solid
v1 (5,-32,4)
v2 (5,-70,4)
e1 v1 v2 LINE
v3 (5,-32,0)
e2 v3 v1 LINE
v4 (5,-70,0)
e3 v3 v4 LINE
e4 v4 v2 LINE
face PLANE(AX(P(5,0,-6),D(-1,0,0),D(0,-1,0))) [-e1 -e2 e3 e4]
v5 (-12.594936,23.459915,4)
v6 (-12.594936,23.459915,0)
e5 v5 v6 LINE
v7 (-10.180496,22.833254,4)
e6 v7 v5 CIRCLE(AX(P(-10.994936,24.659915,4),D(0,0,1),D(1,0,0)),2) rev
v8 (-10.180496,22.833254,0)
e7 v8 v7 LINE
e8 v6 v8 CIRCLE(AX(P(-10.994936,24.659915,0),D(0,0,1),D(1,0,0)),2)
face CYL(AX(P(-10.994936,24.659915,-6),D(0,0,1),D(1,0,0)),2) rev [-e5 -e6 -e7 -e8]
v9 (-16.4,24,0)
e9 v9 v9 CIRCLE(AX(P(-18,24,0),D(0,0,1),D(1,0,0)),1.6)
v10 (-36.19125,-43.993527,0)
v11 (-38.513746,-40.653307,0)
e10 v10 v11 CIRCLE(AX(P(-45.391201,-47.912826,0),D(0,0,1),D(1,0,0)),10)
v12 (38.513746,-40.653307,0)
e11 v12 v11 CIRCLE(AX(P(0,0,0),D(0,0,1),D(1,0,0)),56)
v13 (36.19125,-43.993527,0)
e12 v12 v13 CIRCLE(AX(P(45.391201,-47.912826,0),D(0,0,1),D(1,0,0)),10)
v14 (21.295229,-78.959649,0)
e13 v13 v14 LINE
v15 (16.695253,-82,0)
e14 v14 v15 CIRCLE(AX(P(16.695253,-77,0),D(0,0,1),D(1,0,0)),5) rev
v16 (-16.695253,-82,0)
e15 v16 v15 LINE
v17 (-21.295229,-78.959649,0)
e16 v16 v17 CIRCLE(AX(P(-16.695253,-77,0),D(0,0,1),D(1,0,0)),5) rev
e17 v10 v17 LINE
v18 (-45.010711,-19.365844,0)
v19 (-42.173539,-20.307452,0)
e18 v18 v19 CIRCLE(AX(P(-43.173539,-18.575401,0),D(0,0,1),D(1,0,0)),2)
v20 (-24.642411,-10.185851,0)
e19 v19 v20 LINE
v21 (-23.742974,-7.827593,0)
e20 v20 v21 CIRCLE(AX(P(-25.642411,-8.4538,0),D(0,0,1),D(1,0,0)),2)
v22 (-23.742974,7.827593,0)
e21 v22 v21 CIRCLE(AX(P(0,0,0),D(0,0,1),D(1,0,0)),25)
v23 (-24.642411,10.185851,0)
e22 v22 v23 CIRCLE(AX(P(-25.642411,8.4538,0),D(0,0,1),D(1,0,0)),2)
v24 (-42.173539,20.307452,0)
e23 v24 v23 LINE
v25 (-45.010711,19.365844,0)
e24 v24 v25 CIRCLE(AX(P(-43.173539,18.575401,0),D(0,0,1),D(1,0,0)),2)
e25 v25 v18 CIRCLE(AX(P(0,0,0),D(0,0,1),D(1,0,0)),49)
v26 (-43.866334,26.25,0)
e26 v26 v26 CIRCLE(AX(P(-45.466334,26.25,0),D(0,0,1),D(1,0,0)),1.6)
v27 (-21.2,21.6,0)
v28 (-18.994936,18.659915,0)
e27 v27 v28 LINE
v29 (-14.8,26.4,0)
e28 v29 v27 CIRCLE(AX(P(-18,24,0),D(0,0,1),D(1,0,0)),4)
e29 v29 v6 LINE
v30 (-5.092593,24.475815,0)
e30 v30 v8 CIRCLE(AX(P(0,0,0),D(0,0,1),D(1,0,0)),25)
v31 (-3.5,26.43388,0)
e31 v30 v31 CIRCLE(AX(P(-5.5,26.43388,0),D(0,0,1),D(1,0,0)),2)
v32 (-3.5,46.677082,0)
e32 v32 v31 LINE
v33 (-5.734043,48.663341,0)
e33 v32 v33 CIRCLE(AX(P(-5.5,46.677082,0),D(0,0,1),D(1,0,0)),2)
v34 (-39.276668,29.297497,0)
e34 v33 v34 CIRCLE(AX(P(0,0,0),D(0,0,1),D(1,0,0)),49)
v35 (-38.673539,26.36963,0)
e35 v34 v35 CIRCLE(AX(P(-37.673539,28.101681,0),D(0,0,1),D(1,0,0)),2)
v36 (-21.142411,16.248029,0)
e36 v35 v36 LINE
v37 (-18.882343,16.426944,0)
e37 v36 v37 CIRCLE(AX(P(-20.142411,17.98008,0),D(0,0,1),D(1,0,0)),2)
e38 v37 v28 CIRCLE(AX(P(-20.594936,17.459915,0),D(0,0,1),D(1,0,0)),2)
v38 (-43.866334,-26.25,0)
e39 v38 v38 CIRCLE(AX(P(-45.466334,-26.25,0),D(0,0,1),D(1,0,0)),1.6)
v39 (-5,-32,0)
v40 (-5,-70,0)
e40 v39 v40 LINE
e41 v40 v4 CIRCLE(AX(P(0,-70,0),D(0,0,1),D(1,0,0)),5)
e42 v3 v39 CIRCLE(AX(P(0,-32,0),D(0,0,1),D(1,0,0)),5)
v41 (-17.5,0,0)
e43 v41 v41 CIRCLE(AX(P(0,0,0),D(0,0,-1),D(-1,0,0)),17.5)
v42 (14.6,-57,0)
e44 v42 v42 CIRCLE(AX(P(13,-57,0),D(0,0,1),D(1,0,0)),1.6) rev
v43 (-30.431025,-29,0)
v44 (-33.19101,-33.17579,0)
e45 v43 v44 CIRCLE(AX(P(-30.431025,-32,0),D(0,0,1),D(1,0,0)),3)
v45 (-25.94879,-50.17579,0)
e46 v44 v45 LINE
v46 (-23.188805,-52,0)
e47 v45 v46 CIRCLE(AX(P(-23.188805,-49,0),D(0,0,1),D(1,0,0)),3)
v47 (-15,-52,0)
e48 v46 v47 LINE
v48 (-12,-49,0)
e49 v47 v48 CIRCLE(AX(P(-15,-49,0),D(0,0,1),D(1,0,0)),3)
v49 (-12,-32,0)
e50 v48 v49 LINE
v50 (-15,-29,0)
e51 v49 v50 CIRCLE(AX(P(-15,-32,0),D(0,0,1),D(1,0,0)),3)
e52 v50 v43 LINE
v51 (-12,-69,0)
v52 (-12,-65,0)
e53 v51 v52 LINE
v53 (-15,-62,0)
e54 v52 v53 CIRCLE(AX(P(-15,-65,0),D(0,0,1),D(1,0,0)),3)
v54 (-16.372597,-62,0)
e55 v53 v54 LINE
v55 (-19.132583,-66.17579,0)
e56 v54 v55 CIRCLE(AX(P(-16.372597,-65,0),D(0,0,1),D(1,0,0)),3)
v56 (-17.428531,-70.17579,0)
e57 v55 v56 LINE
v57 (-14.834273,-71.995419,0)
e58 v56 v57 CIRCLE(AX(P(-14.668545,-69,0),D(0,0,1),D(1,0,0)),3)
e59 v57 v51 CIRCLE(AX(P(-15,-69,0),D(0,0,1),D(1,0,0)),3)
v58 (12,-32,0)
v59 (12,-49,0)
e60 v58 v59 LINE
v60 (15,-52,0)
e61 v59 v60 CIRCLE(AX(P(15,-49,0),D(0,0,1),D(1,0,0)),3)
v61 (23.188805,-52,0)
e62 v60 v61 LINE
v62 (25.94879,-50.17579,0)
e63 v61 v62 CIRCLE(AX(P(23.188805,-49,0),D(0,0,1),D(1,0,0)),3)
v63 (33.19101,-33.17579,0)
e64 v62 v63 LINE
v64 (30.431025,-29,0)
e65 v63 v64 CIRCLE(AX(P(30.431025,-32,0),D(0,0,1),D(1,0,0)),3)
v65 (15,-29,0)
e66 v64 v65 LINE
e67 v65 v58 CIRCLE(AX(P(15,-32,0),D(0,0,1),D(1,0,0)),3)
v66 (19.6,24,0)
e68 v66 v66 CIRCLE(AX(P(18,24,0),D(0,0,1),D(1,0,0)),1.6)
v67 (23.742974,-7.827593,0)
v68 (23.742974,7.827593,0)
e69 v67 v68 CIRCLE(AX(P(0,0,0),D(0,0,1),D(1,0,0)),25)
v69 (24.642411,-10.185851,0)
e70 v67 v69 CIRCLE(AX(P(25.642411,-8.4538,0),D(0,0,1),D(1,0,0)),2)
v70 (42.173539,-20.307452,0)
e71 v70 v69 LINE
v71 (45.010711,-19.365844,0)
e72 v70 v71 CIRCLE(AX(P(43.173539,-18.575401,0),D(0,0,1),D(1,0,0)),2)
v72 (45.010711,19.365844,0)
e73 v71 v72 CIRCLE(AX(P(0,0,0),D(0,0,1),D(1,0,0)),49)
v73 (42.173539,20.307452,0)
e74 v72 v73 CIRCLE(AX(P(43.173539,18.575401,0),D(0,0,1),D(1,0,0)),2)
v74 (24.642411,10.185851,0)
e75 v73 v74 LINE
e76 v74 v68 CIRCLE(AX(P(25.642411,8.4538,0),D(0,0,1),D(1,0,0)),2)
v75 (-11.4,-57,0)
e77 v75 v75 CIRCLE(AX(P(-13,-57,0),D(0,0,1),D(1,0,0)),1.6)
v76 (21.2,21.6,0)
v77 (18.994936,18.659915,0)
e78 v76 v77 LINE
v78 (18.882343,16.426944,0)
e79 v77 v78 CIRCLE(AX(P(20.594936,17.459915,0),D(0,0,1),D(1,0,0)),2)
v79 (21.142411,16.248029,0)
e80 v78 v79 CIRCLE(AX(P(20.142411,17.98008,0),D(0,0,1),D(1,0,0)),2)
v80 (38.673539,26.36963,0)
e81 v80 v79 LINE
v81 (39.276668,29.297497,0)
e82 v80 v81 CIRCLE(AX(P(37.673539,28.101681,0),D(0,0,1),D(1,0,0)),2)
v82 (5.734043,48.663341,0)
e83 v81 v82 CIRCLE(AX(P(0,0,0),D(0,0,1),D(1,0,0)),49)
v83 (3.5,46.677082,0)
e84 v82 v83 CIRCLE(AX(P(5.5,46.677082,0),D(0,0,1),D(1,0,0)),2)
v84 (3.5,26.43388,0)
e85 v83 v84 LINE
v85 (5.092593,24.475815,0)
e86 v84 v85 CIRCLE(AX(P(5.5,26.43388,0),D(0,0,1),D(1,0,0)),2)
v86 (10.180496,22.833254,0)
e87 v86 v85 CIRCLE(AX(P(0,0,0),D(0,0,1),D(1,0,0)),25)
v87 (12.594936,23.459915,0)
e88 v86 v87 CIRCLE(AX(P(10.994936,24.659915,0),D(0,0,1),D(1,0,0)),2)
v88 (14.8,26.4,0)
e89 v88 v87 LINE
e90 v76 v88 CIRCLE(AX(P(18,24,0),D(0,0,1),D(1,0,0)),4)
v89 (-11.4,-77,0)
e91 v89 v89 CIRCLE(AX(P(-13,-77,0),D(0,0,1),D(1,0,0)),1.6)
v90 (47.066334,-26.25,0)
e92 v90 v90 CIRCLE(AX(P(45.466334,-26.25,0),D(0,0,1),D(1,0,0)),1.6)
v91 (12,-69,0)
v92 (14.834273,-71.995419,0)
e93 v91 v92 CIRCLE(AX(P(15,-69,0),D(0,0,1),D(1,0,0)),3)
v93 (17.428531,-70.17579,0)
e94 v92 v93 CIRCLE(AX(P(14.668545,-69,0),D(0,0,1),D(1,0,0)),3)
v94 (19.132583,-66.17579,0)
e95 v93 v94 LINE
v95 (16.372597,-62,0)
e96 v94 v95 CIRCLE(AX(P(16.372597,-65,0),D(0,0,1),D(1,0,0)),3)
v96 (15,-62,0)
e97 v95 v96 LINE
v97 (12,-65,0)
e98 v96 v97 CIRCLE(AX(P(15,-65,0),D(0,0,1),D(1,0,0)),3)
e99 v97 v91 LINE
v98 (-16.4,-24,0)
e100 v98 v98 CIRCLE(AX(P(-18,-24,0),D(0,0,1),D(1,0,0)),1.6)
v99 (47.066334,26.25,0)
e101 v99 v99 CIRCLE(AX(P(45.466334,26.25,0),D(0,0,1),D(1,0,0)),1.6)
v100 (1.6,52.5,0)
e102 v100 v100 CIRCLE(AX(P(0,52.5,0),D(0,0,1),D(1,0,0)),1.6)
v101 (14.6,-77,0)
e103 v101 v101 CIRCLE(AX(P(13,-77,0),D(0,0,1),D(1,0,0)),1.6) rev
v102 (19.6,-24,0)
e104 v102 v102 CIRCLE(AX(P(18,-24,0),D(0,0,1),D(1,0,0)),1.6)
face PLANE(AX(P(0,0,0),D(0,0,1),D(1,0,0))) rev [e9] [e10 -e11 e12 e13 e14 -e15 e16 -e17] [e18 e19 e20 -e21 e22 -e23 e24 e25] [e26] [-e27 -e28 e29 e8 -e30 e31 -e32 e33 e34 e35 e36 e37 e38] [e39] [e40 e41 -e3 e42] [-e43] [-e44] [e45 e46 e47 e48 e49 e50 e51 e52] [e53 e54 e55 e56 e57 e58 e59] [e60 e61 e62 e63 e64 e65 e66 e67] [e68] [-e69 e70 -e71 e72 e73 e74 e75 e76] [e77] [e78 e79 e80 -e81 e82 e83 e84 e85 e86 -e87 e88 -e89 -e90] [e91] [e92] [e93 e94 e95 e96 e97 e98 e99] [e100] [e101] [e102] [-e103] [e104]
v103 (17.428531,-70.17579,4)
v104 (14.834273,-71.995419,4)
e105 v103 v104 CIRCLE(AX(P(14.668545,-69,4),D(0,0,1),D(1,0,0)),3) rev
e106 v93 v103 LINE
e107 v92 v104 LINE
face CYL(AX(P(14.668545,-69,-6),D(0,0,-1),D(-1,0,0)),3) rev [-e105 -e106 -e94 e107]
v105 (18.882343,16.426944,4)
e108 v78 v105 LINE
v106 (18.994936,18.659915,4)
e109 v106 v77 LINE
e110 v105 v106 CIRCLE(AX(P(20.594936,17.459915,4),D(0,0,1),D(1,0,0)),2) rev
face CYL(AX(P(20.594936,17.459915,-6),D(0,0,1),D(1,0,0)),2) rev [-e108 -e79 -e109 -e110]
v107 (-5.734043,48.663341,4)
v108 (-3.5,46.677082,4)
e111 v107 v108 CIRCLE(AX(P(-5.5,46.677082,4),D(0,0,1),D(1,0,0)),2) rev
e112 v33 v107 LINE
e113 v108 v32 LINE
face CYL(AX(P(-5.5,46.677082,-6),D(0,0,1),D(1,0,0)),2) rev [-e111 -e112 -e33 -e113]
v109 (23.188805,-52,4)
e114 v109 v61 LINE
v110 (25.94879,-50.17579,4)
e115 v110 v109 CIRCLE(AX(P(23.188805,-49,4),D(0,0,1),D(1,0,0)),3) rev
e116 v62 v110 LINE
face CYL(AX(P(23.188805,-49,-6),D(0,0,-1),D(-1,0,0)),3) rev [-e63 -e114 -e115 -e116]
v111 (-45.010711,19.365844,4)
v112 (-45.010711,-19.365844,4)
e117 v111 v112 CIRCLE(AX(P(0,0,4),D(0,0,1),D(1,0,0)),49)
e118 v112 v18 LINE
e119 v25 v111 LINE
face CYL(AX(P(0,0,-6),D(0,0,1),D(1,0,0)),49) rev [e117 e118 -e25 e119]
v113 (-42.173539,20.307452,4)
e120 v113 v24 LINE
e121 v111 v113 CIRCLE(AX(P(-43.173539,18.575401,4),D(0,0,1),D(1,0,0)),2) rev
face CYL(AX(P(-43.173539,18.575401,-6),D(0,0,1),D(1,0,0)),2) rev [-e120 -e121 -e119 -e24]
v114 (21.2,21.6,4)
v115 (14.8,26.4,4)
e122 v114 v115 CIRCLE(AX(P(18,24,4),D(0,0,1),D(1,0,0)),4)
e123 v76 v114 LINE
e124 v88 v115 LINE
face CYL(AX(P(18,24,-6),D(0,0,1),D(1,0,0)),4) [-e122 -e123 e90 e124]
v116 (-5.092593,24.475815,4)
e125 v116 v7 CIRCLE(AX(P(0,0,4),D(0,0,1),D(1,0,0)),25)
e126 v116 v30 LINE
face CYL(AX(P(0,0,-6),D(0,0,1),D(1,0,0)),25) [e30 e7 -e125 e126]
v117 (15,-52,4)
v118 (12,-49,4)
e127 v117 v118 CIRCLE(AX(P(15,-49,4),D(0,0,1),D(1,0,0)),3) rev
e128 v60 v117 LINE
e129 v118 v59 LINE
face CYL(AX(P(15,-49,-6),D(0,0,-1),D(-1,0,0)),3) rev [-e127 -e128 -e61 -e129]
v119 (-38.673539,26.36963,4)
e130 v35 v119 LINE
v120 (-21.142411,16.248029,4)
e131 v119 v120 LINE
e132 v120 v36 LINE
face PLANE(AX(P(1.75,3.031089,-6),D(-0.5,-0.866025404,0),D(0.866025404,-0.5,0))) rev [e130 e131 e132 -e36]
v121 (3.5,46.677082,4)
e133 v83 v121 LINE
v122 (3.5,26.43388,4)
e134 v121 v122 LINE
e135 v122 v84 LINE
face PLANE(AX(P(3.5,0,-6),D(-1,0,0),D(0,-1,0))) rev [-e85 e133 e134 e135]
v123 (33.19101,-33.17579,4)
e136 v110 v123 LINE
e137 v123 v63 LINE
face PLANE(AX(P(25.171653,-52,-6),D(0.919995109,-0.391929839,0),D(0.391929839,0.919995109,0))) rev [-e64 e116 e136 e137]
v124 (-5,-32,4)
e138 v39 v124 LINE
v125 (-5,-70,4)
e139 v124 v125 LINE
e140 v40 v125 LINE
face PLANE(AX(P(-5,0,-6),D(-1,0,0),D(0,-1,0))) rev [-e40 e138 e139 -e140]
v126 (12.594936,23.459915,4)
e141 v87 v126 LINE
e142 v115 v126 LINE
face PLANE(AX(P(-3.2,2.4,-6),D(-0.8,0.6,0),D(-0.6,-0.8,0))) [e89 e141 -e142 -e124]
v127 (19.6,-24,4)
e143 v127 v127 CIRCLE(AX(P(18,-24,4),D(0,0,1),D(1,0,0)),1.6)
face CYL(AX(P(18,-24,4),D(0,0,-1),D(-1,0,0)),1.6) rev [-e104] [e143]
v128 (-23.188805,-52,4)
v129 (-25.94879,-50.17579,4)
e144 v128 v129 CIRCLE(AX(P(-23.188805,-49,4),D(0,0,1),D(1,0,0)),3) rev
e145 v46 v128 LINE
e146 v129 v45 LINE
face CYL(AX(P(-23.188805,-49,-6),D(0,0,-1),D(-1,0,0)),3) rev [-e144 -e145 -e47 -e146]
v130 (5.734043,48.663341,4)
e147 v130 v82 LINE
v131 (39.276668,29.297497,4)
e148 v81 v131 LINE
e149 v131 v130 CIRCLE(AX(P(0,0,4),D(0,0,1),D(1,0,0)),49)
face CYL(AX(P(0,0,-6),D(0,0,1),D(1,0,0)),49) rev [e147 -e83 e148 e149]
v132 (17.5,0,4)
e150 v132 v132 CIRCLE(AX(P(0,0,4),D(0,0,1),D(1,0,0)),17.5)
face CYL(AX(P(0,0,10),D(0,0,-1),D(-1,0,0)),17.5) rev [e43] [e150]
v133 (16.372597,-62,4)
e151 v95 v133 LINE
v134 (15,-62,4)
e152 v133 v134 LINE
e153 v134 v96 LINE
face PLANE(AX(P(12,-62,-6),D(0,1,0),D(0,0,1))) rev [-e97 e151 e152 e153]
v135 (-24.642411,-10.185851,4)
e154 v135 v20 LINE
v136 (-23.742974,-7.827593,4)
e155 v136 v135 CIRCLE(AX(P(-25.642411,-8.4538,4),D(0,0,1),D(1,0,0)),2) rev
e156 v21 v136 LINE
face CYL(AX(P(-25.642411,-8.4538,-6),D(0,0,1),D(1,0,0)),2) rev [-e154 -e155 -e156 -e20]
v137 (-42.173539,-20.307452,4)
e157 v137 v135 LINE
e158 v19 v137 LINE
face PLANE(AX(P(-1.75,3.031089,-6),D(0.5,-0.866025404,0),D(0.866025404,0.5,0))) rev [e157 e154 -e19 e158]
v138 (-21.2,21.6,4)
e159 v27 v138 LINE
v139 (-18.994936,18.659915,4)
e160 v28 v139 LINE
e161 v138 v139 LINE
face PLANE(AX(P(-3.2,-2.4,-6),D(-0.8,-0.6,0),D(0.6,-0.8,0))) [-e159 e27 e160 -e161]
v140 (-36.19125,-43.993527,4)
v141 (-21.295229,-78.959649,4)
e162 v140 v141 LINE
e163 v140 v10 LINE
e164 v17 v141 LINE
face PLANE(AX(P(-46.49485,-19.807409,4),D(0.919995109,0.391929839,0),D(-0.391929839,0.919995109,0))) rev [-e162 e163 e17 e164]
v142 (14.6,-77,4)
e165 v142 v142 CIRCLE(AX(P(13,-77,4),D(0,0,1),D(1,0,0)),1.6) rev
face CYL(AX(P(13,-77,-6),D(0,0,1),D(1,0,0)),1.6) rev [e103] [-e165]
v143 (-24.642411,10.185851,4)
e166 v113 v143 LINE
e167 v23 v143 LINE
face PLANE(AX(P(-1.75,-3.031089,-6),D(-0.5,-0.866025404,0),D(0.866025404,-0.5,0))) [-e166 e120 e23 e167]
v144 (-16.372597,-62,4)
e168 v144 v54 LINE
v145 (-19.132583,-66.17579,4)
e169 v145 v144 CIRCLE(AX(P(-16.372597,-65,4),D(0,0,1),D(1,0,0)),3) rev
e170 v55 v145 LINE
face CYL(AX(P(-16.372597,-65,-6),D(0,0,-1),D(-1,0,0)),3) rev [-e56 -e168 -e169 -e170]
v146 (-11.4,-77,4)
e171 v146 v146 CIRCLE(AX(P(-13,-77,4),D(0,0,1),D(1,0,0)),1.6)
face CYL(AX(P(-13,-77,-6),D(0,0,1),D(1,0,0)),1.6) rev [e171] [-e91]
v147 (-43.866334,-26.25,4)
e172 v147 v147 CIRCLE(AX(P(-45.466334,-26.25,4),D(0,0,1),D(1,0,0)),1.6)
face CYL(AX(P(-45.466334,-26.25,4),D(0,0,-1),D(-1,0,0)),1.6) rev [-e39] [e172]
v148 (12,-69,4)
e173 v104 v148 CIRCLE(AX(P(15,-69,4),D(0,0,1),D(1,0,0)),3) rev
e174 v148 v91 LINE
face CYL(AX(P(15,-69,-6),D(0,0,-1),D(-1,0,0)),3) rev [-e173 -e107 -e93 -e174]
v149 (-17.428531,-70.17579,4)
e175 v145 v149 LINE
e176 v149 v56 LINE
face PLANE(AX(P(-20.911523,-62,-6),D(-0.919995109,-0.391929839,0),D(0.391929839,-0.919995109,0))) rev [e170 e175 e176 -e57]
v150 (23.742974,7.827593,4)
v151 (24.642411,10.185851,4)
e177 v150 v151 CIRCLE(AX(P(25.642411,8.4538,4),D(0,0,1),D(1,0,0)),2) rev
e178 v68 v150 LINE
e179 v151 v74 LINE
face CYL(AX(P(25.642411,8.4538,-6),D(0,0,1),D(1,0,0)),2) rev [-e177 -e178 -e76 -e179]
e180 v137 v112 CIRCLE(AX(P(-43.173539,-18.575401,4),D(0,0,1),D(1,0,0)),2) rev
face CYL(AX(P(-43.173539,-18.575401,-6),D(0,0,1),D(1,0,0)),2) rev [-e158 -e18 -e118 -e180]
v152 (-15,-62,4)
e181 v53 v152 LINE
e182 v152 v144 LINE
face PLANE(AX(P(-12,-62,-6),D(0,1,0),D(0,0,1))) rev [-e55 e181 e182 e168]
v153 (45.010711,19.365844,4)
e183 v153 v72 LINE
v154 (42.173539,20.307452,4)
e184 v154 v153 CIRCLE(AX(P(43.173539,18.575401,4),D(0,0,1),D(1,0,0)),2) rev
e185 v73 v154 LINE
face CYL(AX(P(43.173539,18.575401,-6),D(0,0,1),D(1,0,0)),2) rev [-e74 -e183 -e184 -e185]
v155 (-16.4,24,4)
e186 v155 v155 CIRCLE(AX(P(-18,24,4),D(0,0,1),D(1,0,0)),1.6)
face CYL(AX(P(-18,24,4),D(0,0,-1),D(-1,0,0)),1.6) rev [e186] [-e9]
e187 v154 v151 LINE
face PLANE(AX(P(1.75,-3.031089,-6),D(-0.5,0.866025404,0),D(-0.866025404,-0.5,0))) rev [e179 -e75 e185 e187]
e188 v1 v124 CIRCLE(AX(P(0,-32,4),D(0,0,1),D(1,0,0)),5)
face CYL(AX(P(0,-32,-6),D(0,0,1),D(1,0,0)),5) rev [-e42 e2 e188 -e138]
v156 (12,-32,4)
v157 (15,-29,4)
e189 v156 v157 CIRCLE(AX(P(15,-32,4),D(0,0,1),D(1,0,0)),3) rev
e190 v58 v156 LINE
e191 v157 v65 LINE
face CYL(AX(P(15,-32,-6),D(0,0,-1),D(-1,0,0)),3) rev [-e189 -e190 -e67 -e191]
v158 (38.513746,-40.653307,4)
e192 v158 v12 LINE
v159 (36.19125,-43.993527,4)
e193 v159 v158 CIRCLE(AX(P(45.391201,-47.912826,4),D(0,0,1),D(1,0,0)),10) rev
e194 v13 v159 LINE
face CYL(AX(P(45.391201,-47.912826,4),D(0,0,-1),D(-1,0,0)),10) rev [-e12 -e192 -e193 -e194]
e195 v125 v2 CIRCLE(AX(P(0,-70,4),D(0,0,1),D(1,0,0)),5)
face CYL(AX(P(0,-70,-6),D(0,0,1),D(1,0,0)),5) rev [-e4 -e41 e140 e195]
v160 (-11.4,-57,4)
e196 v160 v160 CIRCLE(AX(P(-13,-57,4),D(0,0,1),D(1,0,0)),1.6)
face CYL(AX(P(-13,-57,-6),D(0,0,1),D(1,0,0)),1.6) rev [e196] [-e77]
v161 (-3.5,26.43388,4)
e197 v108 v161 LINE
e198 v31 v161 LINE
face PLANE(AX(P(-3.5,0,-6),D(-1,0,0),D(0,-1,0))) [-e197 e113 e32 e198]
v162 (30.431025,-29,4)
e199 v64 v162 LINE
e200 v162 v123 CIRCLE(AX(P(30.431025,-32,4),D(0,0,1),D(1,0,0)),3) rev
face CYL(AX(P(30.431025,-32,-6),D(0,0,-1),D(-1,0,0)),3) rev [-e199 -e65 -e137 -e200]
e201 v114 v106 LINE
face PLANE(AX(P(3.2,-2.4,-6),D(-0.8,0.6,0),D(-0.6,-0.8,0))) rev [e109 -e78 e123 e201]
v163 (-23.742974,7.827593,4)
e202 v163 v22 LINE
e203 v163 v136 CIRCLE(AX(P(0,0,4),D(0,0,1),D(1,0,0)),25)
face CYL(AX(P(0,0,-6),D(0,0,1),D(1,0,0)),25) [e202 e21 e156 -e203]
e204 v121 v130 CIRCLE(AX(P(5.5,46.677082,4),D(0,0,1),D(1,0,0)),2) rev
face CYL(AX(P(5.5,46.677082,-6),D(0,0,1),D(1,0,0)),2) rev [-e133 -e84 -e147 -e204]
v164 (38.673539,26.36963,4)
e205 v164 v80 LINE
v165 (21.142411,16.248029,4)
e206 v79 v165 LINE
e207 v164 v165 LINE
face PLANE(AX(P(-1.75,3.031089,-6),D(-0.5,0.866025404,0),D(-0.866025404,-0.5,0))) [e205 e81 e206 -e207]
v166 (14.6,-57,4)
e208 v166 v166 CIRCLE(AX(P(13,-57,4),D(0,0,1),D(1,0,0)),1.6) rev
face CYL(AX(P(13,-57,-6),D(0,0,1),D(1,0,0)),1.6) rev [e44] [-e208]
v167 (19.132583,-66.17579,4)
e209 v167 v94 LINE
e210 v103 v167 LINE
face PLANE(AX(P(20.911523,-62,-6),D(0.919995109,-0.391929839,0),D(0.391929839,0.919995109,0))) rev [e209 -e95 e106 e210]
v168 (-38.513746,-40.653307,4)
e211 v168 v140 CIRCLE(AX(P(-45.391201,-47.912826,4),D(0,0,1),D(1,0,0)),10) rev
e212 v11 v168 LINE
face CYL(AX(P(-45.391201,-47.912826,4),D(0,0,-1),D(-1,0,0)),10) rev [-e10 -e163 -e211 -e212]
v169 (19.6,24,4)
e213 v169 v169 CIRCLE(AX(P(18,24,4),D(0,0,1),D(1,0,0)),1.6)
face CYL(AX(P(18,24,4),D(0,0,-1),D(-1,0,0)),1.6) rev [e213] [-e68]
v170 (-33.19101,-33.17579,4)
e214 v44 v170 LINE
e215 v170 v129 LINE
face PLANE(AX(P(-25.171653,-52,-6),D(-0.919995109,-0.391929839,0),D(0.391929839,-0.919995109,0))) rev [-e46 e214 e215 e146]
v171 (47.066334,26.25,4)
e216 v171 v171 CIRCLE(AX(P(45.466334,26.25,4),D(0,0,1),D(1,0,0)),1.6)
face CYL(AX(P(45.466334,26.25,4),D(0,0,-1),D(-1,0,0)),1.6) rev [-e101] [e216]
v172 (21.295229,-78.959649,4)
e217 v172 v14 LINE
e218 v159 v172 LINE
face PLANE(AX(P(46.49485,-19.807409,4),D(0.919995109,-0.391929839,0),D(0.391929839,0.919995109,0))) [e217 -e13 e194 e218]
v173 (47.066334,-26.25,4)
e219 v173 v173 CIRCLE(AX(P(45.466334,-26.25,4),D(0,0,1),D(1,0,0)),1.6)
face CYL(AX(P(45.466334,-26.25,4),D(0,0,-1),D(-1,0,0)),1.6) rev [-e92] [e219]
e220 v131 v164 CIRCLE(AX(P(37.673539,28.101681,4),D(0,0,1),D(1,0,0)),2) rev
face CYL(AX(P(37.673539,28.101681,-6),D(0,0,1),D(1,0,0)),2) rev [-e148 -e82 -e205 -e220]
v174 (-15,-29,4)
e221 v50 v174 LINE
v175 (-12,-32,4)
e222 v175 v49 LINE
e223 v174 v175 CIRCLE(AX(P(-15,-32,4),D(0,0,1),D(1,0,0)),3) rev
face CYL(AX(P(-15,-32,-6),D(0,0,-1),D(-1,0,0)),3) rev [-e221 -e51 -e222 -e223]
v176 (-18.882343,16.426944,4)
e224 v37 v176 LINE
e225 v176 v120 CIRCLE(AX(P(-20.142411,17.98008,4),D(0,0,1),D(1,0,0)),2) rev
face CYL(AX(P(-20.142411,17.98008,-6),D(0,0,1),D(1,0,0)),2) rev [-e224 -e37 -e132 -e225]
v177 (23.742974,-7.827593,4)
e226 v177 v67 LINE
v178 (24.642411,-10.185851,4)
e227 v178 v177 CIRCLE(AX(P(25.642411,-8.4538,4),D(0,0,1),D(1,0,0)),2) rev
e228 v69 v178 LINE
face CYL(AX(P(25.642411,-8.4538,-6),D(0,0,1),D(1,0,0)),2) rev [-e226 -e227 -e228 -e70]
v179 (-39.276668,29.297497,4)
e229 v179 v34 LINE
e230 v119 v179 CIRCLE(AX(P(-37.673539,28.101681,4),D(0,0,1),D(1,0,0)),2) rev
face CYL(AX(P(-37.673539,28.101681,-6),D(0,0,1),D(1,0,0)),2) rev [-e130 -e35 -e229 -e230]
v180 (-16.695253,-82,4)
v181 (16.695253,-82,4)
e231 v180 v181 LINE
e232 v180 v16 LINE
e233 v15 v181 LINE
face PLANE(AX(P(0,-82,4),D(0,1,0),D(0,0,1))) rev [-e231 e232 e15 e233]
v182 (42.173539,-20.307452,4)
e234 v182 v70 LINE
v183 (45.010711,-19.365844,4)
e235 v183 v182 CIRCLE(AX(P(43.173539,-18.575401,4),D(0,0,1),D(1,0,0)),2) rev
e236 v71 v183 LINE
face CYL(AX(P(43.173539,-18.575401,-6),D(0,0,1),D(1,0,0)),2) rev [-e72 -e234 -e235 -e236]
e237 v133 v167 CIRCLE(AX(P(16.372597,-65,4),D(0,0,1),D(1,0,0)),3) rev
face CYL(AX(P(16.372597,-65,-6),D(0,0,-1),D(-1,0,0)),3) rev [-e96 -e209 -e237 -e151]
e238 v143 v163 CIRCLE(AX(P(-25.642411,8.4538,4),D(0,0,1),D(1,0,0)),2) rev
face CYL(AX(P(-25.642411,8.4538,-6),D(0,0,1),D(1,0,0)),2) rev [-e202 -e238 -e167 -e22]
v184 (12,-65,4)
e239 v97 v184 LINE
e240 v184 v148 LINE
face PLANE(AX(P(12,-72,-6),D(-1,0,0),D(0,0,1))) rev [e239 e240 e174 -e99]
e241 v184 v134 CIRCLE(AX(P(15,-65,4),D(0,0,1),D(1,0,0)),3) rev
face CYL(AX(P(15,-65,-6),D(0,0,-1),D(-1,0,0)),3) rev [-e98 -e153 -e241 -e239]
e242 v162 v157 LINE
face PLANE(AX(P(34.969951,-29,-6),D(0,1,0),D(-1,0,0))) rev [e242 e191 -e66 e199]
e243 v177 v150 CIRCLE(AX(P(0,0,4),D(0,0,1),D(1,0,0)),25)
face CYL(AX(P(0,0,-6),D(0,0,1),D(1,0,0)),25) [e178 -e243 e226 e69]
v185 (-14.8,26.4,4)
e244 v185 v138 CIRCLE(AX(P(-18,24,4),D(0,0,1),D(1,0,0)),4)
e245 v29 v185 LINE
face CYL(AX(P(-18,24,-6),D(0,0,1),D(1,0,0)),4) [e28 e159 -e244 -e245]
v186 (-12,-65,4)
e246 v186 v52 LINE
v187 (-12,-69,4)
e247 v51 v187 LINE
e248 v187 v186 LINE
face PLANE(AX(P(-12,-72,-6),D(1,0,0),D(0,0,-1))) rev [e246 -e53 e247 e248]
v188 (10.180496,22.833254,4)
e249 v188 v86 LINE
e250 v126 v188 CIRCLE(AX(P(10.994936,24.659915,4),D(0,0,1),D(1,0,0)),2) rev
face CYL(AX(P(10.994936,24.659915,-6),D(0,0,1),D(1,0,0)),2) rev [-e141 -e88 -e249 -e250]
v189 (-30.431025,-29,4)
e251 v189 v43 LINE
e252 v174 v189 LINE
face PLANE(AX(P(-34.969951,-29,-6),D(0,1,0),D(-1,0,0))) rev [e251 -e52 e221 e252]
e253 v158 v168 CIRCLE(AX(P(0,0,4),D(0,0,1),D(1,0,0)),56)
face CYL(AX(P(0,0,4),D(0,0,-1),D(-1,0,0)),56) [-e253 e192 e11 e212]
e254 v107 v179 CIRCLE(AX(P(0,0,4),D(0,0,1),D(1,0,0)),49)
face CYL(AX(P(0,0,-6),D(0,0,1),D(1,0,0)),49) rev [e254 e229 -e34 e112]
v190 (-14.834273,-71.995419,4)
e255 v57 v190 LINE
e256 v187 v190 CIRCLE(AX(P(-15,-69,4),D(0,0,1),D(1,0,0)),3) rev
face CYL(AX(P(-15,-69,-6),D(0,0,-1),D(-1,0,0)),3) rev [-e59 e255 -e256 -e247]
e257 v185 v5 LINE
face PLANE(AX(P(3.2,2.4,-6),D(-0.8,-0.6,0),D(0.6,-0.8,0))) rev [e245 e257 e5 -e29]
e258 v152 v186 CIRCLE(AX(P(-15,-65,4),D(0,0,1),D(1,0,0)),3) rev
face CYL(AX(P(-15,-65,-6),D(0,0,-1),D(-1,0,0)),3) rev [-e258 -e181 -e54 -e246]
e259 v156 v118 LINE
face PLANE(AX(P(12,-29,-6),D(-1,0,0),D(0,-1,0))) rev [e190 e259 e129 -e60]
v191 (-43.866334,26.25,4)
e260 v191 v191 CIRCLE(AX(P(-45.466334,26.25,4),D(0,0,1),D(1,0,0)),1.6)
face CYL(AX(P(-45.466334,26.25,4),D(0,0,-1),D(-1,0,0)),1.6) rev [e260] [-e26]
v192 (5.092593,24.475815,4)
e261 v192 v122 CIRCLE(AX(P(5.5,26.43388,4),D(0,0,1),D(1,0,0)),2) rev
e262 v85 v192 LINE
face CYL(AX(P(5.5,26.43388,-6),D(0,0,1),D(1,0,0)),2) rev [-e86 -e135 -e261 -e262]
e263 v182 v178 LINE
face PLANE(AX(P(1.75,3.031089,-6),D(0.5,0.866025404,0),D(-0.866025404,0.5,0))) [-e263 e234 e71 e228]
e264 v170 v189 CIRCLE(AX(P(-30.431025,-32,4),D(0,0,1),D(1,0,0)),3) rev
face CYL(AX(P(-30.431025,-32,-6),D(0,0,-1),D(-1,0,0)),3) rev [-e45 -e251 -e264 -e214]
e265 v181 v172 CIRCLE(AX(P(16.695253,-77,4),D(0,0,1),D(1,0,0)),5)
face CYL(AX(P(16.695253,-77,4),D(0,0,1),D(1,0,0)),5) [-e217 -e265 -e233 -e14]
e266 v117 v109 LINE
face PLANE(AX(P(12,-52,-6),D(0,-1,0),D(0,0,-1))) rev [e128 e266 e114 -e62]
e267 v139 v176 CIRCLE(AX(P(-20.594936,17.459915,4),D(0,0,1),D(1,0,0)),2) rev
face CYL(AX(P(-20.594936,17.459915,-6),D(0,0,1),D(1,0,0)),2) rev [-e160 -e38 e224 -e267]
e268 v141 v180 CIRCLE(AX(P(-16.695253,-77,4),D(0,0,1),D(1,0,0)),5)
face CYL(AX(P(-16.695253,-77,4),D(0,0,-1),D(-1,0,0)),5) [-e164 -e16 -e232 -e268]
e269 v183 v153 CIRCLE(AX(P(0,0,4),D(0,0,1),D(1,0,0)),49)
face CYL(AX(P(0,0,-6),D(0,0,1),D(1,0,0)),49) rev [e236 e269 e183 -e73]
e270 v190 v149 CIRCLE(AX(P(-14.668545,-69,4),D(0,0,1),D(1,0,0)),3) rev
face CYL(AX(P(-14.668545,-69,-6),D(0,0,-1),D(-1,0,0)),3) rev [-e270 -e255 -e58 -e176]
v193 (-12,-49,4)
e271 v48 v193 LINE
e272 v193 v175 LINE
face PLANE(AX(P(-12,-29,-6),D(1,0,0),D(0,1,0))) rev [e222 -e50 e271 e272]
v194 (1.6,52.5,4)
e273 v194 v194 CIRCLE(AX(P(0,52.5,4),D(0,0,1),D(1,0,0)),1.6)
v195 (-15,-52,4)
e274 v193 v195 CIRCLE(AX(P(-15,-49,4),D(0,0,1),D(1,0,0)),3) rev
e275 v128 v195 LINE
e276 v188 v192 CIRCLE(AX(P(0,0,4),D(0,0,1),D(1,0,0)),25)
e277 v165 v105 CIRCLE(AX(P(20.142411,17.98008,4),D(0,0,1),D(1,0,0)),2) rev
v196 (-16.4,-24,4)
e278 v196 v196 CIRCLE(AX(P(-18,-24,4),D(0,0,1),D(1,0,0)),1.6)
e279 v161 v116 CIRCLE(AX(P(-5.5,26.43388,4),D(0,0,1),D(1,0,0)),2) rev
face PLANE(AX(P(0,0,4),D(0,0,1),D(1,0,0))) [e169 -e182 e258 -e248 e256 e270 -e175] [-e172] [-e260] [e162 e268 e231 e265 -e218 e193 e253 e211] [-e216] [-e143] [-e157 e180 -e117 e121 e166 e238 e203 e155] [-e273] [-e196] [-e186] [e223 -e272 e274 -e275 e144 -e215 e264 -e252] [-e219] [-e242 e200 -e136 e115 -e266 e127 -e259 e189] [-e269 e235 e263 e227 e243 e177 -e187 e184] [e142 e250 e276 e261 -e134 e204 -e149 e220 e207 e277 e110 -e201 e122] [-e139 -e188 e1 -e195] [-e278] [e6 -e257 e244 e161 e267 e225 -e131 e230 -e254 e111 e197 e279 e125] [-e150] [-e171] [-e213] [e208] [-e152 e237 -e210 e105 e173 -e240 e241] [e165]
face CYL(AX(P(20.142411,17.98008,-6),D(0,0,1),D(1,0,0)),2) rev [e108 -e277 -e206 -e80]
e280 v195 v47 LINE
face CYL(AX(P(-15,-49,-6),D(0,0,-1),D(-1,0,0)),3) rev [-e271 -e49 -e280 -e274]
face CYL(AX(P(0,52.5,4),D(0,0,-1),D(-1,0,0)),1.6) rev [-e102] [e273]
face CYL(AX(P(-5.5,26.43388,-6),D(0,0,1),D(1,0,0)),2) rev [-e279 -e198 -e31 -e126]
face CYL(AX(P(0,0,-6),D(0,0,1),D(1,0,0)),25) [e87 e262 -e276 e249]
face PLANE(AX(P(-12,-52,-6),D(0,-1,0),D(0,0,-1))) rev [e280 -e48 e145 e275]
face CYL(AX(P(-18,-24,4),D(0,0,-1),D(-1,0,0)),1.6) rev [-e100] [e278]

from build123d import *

# Parameters (mm, degrees)
SKETCH_1_R          = 1.6
EXTRUDE_1_DEPTH     = 4
FILLET_1_R          = 10
FILLET_2_R          = 5
SKETCH_2_R          = 1.6
CUT_EXTRUDE_3_DEPTH = 10
SKETCH_3_R          = 17.5
CUT_EXTRUDE_4_DEPTH = 10
FILLET_3_R          = 2
CUT_EXTRUDE_5_DEPTH = 10
FILLET_4_R          = 3


with BuildPart() as part:
    # 草图1 → 凸台-拉伸1 (new body)
    # profile 1 of 13: a face of its own
    with BuildSketch(Plane.XY):
        with BuildLine():
            Line((-37.040518355, -42), (-31.5, -42))
            Line((-31.5, -42), (-20, -42))
            Line((-20, -42), (0, -42))
            Line((0, -42), (20, -42))
            Line((20, -42), (31.5, -42))
            Line((31.5, -42), (37.040518355, -42))
            ThreePointArc((37.040518355, -42), (51.040518355, -23.040518355), (56, 0))
            ThreePointArc((56, 0), (-23.040518355, 51.040518355), (-37.040518355, -42))
        make_face()
        with Locations((-45.466333699, -26.25)):
            Circle(SKETCH_1_R, mode=Mode.SUBTRACT)
        with Locations((-18, -24)):
            Circle(SKETCH_1_R, mode=Mode.SUBTRACT)
        with Locations((18, -24)):
            Circle(SKETCH_1_R, mode=Mode.SUBTRACT)
        with Locations((45.466333699, -26.25)):
            Circle(SKETCH_1_R, mode=Mode.SUBTRACT)
        with Locations((-45.466333699, 26.25)):
            Circle(SKETCH_1_R, mode=Mode.SUBTRACT)
        with Locations((-18, 24)):
            Circle(SKETCH_1_R, mode=Mode.SUBTRACT)
        with Locations((18, 24)):
            Circle(SKETCH_1_R, mode=Mode.SUBTRACT)
        with Locations((0, 52.5)):
            Circle(SKETCH_1_R, mode=Mode.SUBTRACT)
        with Locations((45.466333699, 26.25)):
            Circle(SKETCH_1_R, mode=Mode.SUBTRACT)
    # profile 2 of 13: a face of its own
    with BuildSketch(Plane.XY):
        with BuildLine():
            Line((20, -82), (37.040518355, -42))
            ThreePointArc((37.040518355, -42), (28.982109133, -47.916983943), (20, -52.306787322))
            Line((20, -52.306787322), (20, -82))
        make_face()
    # profile 3 of 13: a face of its own
    with BuildSketch(Plane.XY):
        with BuildLine():
            Line((31.5, -42), (20, -42))
            Line((20, -42), (20, -52.306787322))
            ThreePointArc((20, -52.306787322), (28.982109133, -47.916983943), (37.040518355, -42))
            Line((37.040518355, -42), (31.5, -42))
        make_face()
    # profile 4 of 13: a face of its own
    with BuildSketch(Plane.XY):
        with BuildLine():
            Line((20, -42), (0, -42))
            Line((0, -42), (0, -50.9))
            ThreePointArc((0, -50.9), (1.13137085, -51.36862915), (1.6, -52.5))
            ThreePointArc((1.6, -52.5), (1.13137085, -53.63137085), (0, -54.1))
            Line((0, -54.1), (0, -56))
            ThreePointArc((0, -56), (10.16906854, -55.068957181), (20, -52.306787322))
            Line((20, -52.306787322), (20, -42))
        make_face()
    # profile 5 of 13: a face of its own
    with BuildSketch(Plane.XY):
        with BuildLine():
            ThreePointArc((20, -52.306787322), (10.16906854, -55.068957181), (0, -56))
            Line((0, -56), (0, -82))
            Line((0, -82), (20, -82))
            Line((20, -82), (20, -52.306787322))
        make_face()
    # profile 6 of 13: a face of its own
    with BuildSketch(Plane.XY):
        with BuildLine():
            ThreePointArc((0, -56), (-10.16906854, -55.068957181), (-20, -52.306787322))
            Line((-20, -52.306787322), (-20, -82))
            Line((-20, -82), (0, -82))
            Line((0, -82), (0, -56))
        make_face()
    # profile 7 of 13: a face of its own
    with BuildSketch(Plane.XY):
        with BuildLine():
            Line((0, -42), (-20, -42))
            Line((-20, -42), (-20, -52.306787322))
            ThreePointArc((-20, -52.306787322), (-10.16906854, -55.068957181), (0, -56))
            Line((0, -56), (0, -54.1))
            ThreePointArc((0, -54.1), (-1.6, -52.5), (0, -50.9))
            Line((0, -50.9), (0, -42))
        make_face()
    # profile 8 of 13: a face of its own
    with BuildSketch(Plane.XY):
        with BuildLine():
            ThreePointArc((-20, -52.306787322), (-28.982109133, -47.916983943), (-37.040518355, -42))
            Line((-37.040518355, -42), (-20, -82))
            Line((-20, -82), (-20, -52.306787322))
        make_face()
    # profile 9 of 13: a face of its own
    with BuildSketch(Plane.XY):
        with BuildLine():
            Line((-20, -42), (-31.5, -42))
            Line((-31.5, -42), (-37.040518355, -42))
            ThreePointArc((-37.040518355, -42), (-28.982109133, -47.916983943), (-20, -52.306787322))
            Line((-20, -52.306787322), (-20, -42))
        make_face()
    # profile 10 of 13: a face of its own
    with BuildSketch(Plane.XY):
        with BuildLine():
            ThreePointArc((1.6, -52.5), (1.13137085, -51.36862915), (0, -50.9))
            Line((0, -50.9), (0, -54.1))
            ThreePointArc((0, -54.1), (1.13137085, -53.63137085), (1.6, -52.5))
        make_face()
    # profile 11 of 13: a face of its own
    with BuildSketch(Plane.XY):
        with BuildLine():
            Line((0, -54.1), (0, -50.9))
            ThreePointArc((0, -50.9), (-1.6, -52.5), (0, -54.1))
        make_face()
    # profile 12 of 13: a face of its own
    with BuildSketch(Plane.XY):
        with BuildLine():
            ThreePointArc((1.6, -52.5), (1.13137085, -51.36862915), (0, -50.9))
            Line((0, -50.9), (0, -54.1))
            ThreePointArc((0, -54.1), (1.13137085, -53.63137085), (1.6, -52.5))
        make_face()
    # profile 13 of 13: a face of its own
    with BuildSketch(Plane.XY):
        with BuildLine():
            Line((0, -54.1), (0, -50.9))
            ThreePointArc((0, -50.9), (-1.6, -52.5), (0, -54.1))
        make_face()
    extrude(amount=EXTRUDE_1_DEPTH)

    # 圆角1
    fillet_1_edges = [part.edges().sort_by_distance(p)[0] for p in [
        (-37.040518355, -42, 2),
        (37.040518355, -42, 2),
    ]]
    fillet(fillet_1_edges, radius=FILLET_1_R)

    # 圆角2
    fillet_2_edges = [part.edges().sort_by_distance(p)[0] for p in [
        (-20, -82, 2),
        (20, -82, 2),
    ]]
    fillet(fillet_2_edges, radius=FILLET_2_R)

    # 草图2 → 切除-拉伸3 (cut)
    with BuildSketch(Plane.XY.offset(4)):
        with BuildLine():
            Line((-3.5, 24.753787589), (-3.5, 48.874840153))
            ThreePointArc((-3.5, 48.874840153), (-24.5, 42.435244785), (-40.576853179, 27.46850899))
            Line((-40.576853179, 27.46850899), (-19.687408892, 15.407982708))
            ThreePointArc((-19.687408892, 15.407982708), (-18.871882173, 16.396708915), (-18.006755215, 17.342340287))
            Line((-18.006755215, 17.342340287), (-21.2, 21.6))
            ThreePointArc((-21.2, 21.6), (-20.4, 27.2), (-14.8, 26.4))
            Line((-14.8, 26.4), (-11.606755215, 22.142340287))
            ThreePointArc((-11.606755215, 22.142340287), (-7.66540459, 23.795830989), (-3.5, 24.753787589))
        make_face()
        with BuildLine():
            ThreePointArc((40.576853179, 27.46850899), (24.5, 42.435244785), (3.5, 48.874840153))
            Line((3.5, 48.874840153), (3.5, 24.753787589))
            ThreePointArc((3.5, 24.753787589), (7.66540459, 23.795830989), (11.606755215, 22.142340287))
            Line((11.606755215, 22.142340287), (14.8, 26.4))
            ThreePointArc((14.8, 26.4), (20.4, 27.2), (21.2, 21.6))
            Line((21.2, 21.6), (18.006755215, 17.342340287))
            ThreePointArc((18.006755215, 17.342340287), (18.871882173, 16.396708915), (19.687408892, 15.407982708))
            Line((19.687408892, 15.407982708), (40.576853179, 27.46850899))
        make_face()
        with BuildLine():
            ThreePointArc((-23.187408892, -9.345804881), (-25, 0), (-23.187408892, 9.345804881))
            Line((-23.187408892, 9.345804881), (-44.076853179, 21.406331163))
            ThreePointArc((-44.076853179, 21.406331163), (-49, 0), (-44.076853179, -21.406331163))
            Line((-44.076853179, -21.406331163), (-23.187408892, -9.345804881))
        make_face()
        with BuildLine():
            Line((44.076853179, 21.406331163), (23.187408892, 9.345804881))
            ThreePointArc((23.187408892, 9.345804881), (25, 0), (23.187408892, -9.345804881))
            Line((23.187408892, -9.345804881), (44.076853179, -21.406331163))
            ThreePointArc((44.076853179, -21.406331163), (49, 0), (44.076853179, 21.406331163))
        make_face()
        with BuildLine():
            Line((-5, -32), (-5, -70))
            ThreePointArc((-5, -70), (0, -75), (5, -70))
            Line((5, -70), (5, -32))
            ThreePointArc((5, -32), (0, -27), (-5, -32))
        make_face()
        with Locations((-13, -77)):
            Circle(SKETCH_2_R)
        with Locations((-13, -57)):
            Circle(SKETCH_2_R)
        with Locations((13, -57)):
            Circle(SKETCH_2_R)
        with Locations((13, -77)):
            Circle(SKETCH_2_R)
    extrude(amount=-CUT_EXTRUDE_3_DEPTH, mode=Mode.SUBTRACT)

    # 草图3 → 切除-拉伸4 (cut)
    with BuildSketch(Plane(origin=(0, 0, 0), x_dir=(-1, 0, 0), z_dir=(0, 0, -1))):
        Circle(SKETCH_3_R)
    extrude(amount=-CUT_EXTRUDE_4_DEPTH, mode=Mode.SUBTRACT)

    # 圆角3
    # the kernel refuses this fillet: 2 mm, written as the material it adds along each edge
    with BuildSketch(Plane(origin=(44.076853179, -21.406331163, 4), x_dir=(0.4161517184579159, 0.9092951925664864, 0), z_dir=(0, 0, -1)), Plane(origin=(40.576853179, 27.46850899, 4), x_dir=(-0.5793968770727322, 0.8150455562963123, 0), z_dir=(0, 0, -1)), Plane(origin=(-44.076853179, 21.406331163, 4), x_dir=(-0.4161517184579201, -0.9092951925664845, 0), z_dir=(0, 0, -1)), Plane(origin=(-3.5, 48.874840153, 4), x_dir=(-0.9955485955305929, -0.09424963627019442, 0), z_dir=(0, 0, -1))) as fillet_3_piece_1:
        with BuildLine():
            CenterArc((2.198235081, -1.9994756), FILLET_3_R, 88.687910399, 96.72022296)
            Line((0.20713789, -2.187974872), (0, 0))
            ThreePointArc((0, 0), (1.122015823, 0.012847802), (2.244031646, 0))
        make_face()
    extrude(amount=4)
    with BuildSketch(Plane(origin=(23.187408892, -9.345804881, 4), x_dir=(0.8660254037844346, -0.500000000000007, 0), z_dir=(0, 0, -1)), Plane(origin=(19.687408892, 15.407982708, 4), x_dir=(0.8660254037844409, 0.4999999999999962, 0), z_dir=(0, 0, -1)), Plane(origin=(-3.5, 24.753787589, 4), x_dir=(0, 1, 0), z_dir=(0, 0, -1))) as fillet_3_piece_2:
        with BuildLine():
            CenterArc((1.680092187, -2), FILLET_3_R, 90, 78.246374383)
            ThreePointArc((-0.277972982, -1.592592593), (-0.126109645, -0.798543836), (0, 0))
            Line((0, 0), (1.680092187, 0))
        make_face()
    extrude(amount=4)
    with BuildSketch(Plane(origin=(23.187408892, 9.345804881, 4), x_dir=(0.8660254037844413, 0.49999999999999545, 0), z_dir=(0, 0, -1)), Plane(origin=(3.5, 24.753787589, 4), x_dir=(0, 1, 0), z_dir=(0, 0, -1)), Plane(origin=(-23.187408892, -9.345804881, 4), x_dir=(-0.8660254037844479, -0.49999999999998407, 0), z_dir=(0, 0, -1)), Plane(origin=(-19.687408892, 15.407982708, 4), x_dir=(-0.8660254037844282, 0.5000000000000182, 0), z_dir=(0, 0, -1))) as fillet_3_piece_3:
        with BuildLine():
            CenterArc((1.680092187, 2), FILLET_3_R, 191.753625617, 78.246374383)
            ThreePointArc((-0.277972982, 1.592592593), (-0.126109645, 0.798543836), (0, 0))
            Line((0, 0), (1.680092187, 0))
        make_face()
    extrude(amount=4)
    with BuildSketch(Plane(origin=(44.076853179, 21.406331163, 4), x_dir=(0.4161517184579126, -0.9092951925664878, 0), z_dir=(0, 0, -1)), Plane(origin=(3.5, 48.874840153, 4), x_dir=(0.9955485955305919, -0.09424963627020293, 0), z_dir=(0, 0, -1))) as fillet_3_piece_4:
        with BuildLine():
            CenterArc((2.198235081, 1.9994756), FILLET_3_R, 174.591866641, 96.72022296)
            Line((0.20713789, 2.187974872), (0, 0))
            ThreePointArc((0, 0), (1.122015823, -0.012847802), (2.244031646, 0))
        make_face()
    extrude(amount=4)
    with BuildSketch(Plane(origin=(18.006755215, 17.342340287, 4), x_dir=(0.6705154511323562, -0.7418955652871723, 0), z_dir=(0, 0, -1)), Plane(origin=(-11.606755215, 22.142340287, 4), x_dir=(0.8999640689927433, 0.43596407480665733, 0), z_dir=(0, 0, -1))) as fillet_3_piece_5:
        with BuildLine():
            CenterArc((1.648187328, -1.998995117), FILLET_3_R, 91.816346093, 77.160411593)
            Line((-0.314912072, -1.616580754), (0, 0))
            ThreePointArc((0, 0), (0.792397754, -0.01256104), (1.584795508, 0))
        make_face()
    extrude(amount=4)
    with BuildSketch(Plane(origin=(11.606755215, 22.142340287, 4), x_dir=(-0.8999640689927446, 0.43596407480665467, 0), z_dir=(0, 0, -1)), Plane(origin=(-18.006755215, 17.342340287, 4), x_dir=(-0.6705154511323576, -0.7418955652871712, 0), z_dir=(0, 0, -1))) as fillet_3_piece_6:
        with BuildLine():
            CenterArc((1.648187328, 1.998995117), FILLET_3_R, 191.023242314, 77.160411593)
            Line((-0.314912072, 1.616580754), (0, 0))
            ThreePointArc((0, 0), (0.792397754, 0.01256104), (1.584795508, 0))
        make_face()
    extrude(amount=4)
    with BuildSketch(Plane(origin=(-23.187408892, 9.345804881, 4), x_dir=(-0.34364763241930923, -0.9390986661329059, 0), z_dir=(0, 0, -1))) as fillet_3_piece_7:
        with BuildLine():
            CenterArc((1.681336239, 1.998954279), FILLET_3_R, 189.900735932, 78.246374383)
            Line((-0.288877997, 1.655070772), (0, 0))
            ThreePointArc((0, 0), (0.80833473, 0.013071518), (1.616669461, 0))
        make_face()
    extrude(amount=4)
    with BuildSketch(Plane(origin=(-44.076853179, -21.406331163, 4), x_dir=(0.8660254037845937, 0.49999999999973144, 0), z_dir=(0, 0, -1)), Plane(origin=(-40.576853179, 27.46850899, 4), x_dir=(0.8660254037845372, -0.49999999999982914, 0), z_dir=(0, 0, -1))) as fillet_3_piece_8:
        with BuildLine():
            CenterArc((2.197757982, -2), FILLET_3_R, 90, 96.72022296)
            ThreePointArc((0.211499166, -2.234042553), (0.092958972, -1.118232177), (0, 0))
            Line((0, 0), (2.197757982, 0))
        make_face()
    extrude(amount=4)

    # 草图4 → 切除-拉伸5 (cut)
    with BuildSketch(Plane.XY.offset(4)):
        Polygon((12, -29), (12, -52), (25.171652668, -52), (34.969950722, -29), align=None)
        Polygon((-34.969950722, -29), (-12, -29), (-12, -52), (-25.171652668, -52), align=None)
        Polygon((12, -62), (20.911523079, -62), (16.65139349, -72), (12, -72), align=None)
        Polygon((-12, -72), (-12, -62), (-20.911523079, -62), (-16.65139349, -72), align=None)
    extrude(amount=-CUT_EXTRUDE_5_DEPTH, mode=Mode.SUBTRACT)

    # 圆角4
    # the kernel refuses this fillet: 3 mm, written as the material it adds along each edge
    with BuildSketch(Plane(origin=(25.171652668, -52, 4), x_dir=(-1, 0, 0), z_dir=(0, 0, -1)), Plane(origin=(-16.65139349, -72, 4), x_dir=(-0.39192983874569454, 0.9199951094982918, 0), z_dir=(0, 0, -1)), Plane(origin=(16.65139349, -72, 4), x_dir=(-1, 0, 0), z_dir=(0, 0, -1)), Plane(origin=(-25.171652668, -52, 4), x_dir=(-0.39192983874569626, 0.919995109498291, 0), z_dir=(0, 0, -1))) as fillet_4_piece_1:
        with BuildLine():
            CenterArc((FILLET_4_R * 0.6609493409, FILLET_4_R), FILLET_4_R, 203.074633013, 66.925366987)
            Line((-FILLET_4_R * 0.259045768598, FILLET_4_R * 0.608070161254), (0, 0))
            Line((0, 0), (FILLET_4_R * 0.6609493409, 0))
        make_face()
    extrude(amount=4)
    with BuildSketch(Plane(origin=(12, -52, 4), x_dir=(0, 1, 0), z_dir=(0, 0, -1)), Plane(origin=(-12, -62, 4), x_dir=(0, -1, 0), z_dir=(0, 0, -1)), Plane(origin=(12, -72, 4), x_dir=(0, 1, 0), z_dir=(0, 0, -1)), Plane(origin=(-12, -29, 4), x_dir=(0, -1, 0), z_dir=(0, 0, -1)), Plane(origin=(-12, -52, 4), x_dir=(-1, 0, 0), z_dir=(0, 0, -1))) as fillet_4_piece_2:
        with BuildLine():
            CenterArc((FILLET_4_R, FILLET_4_R), FILLET_4_R, 180, 90)
            Line((0, FILLET_4_R), (0, 0))
            Line((0, 0), (FILLET_4_R, 0))
        make_face()
    extrude(amount=4)
    with BuildSketch(Plane(origin=(12, -29, 4), x_dir=(0, -1, 0), z_dir=(0, 0, -1)), Plane(origin=(-12, -72, 4), x_dir=(0, 1, 0), z_dir=(0, 0, -1)), Plane(origin=(12, -62, 4), x_dir=(0, -1, 0), z_dir=(0, 0, -1))) as fillet_4_piece_3:
        with BuildLine():
            CenterArc((FILLET_4_R, -FILLET_4_R), FILLET_4_R, 90, 90)
            Line((0, -FILLET_4_R), (0, 0))
            Line((0, 0), (FILLET_4_R, 0))
        make_face()
    extrude(amount=4)
    with BuildSketch(Plane(origin=(34.969950722, -29, 4), x_dir=(-0.3919298387456947, -0.9199951094982918, 0), z_dir=(0, 0, -1)), Plane(origin=(-20.911523079, -62, 4), x_dir=(1, 0, 0), z_dir=(0, 0, -1)), Plane(origin=(20.911523079, -62, 4), x_dir=(-0.39192983874569465, -0.9199951094982918, 0), z_dir=(0, 0, -1))) as fillet_4_piece_4:
        with BuildLine():
            CenterArc((FILLET_4_R * 1.51297525865, FILLET_4_R), FILLET_4_R, 156.925366987, 113.074633013)
            Line((FILLET_4_R * 0.592980149147, FILLET_4_R * 1.39192983875), (0, 0))
            Line((0, 0), (FILLET_4_R * 1.51297525865, 0))
        make_face()
    extrude(amount=4)
    with BuildSketch(Plane(origin=(-34.969950722, -29, 4), x_dir=(0.39192983874569454, -0.9199951094982919, 0), z_dir=(0, 0, -1))) as fillet_4_piece_5:
        with BuildLine():
            CenterArc((FILLET_4_R * 1.51297525865, -FILLET_4_R), FILLET_4_R, 90, 113.074633013)
            Line((FILLET_4_R * 0.592980149147, -FILLET_4_R * 1.39192983875), (0, 0))
            Line((0, 0), (FILLET_4_R * 1.51297525865, 0))
        make_face()
    extrude(amount=4)


solid = part.part
